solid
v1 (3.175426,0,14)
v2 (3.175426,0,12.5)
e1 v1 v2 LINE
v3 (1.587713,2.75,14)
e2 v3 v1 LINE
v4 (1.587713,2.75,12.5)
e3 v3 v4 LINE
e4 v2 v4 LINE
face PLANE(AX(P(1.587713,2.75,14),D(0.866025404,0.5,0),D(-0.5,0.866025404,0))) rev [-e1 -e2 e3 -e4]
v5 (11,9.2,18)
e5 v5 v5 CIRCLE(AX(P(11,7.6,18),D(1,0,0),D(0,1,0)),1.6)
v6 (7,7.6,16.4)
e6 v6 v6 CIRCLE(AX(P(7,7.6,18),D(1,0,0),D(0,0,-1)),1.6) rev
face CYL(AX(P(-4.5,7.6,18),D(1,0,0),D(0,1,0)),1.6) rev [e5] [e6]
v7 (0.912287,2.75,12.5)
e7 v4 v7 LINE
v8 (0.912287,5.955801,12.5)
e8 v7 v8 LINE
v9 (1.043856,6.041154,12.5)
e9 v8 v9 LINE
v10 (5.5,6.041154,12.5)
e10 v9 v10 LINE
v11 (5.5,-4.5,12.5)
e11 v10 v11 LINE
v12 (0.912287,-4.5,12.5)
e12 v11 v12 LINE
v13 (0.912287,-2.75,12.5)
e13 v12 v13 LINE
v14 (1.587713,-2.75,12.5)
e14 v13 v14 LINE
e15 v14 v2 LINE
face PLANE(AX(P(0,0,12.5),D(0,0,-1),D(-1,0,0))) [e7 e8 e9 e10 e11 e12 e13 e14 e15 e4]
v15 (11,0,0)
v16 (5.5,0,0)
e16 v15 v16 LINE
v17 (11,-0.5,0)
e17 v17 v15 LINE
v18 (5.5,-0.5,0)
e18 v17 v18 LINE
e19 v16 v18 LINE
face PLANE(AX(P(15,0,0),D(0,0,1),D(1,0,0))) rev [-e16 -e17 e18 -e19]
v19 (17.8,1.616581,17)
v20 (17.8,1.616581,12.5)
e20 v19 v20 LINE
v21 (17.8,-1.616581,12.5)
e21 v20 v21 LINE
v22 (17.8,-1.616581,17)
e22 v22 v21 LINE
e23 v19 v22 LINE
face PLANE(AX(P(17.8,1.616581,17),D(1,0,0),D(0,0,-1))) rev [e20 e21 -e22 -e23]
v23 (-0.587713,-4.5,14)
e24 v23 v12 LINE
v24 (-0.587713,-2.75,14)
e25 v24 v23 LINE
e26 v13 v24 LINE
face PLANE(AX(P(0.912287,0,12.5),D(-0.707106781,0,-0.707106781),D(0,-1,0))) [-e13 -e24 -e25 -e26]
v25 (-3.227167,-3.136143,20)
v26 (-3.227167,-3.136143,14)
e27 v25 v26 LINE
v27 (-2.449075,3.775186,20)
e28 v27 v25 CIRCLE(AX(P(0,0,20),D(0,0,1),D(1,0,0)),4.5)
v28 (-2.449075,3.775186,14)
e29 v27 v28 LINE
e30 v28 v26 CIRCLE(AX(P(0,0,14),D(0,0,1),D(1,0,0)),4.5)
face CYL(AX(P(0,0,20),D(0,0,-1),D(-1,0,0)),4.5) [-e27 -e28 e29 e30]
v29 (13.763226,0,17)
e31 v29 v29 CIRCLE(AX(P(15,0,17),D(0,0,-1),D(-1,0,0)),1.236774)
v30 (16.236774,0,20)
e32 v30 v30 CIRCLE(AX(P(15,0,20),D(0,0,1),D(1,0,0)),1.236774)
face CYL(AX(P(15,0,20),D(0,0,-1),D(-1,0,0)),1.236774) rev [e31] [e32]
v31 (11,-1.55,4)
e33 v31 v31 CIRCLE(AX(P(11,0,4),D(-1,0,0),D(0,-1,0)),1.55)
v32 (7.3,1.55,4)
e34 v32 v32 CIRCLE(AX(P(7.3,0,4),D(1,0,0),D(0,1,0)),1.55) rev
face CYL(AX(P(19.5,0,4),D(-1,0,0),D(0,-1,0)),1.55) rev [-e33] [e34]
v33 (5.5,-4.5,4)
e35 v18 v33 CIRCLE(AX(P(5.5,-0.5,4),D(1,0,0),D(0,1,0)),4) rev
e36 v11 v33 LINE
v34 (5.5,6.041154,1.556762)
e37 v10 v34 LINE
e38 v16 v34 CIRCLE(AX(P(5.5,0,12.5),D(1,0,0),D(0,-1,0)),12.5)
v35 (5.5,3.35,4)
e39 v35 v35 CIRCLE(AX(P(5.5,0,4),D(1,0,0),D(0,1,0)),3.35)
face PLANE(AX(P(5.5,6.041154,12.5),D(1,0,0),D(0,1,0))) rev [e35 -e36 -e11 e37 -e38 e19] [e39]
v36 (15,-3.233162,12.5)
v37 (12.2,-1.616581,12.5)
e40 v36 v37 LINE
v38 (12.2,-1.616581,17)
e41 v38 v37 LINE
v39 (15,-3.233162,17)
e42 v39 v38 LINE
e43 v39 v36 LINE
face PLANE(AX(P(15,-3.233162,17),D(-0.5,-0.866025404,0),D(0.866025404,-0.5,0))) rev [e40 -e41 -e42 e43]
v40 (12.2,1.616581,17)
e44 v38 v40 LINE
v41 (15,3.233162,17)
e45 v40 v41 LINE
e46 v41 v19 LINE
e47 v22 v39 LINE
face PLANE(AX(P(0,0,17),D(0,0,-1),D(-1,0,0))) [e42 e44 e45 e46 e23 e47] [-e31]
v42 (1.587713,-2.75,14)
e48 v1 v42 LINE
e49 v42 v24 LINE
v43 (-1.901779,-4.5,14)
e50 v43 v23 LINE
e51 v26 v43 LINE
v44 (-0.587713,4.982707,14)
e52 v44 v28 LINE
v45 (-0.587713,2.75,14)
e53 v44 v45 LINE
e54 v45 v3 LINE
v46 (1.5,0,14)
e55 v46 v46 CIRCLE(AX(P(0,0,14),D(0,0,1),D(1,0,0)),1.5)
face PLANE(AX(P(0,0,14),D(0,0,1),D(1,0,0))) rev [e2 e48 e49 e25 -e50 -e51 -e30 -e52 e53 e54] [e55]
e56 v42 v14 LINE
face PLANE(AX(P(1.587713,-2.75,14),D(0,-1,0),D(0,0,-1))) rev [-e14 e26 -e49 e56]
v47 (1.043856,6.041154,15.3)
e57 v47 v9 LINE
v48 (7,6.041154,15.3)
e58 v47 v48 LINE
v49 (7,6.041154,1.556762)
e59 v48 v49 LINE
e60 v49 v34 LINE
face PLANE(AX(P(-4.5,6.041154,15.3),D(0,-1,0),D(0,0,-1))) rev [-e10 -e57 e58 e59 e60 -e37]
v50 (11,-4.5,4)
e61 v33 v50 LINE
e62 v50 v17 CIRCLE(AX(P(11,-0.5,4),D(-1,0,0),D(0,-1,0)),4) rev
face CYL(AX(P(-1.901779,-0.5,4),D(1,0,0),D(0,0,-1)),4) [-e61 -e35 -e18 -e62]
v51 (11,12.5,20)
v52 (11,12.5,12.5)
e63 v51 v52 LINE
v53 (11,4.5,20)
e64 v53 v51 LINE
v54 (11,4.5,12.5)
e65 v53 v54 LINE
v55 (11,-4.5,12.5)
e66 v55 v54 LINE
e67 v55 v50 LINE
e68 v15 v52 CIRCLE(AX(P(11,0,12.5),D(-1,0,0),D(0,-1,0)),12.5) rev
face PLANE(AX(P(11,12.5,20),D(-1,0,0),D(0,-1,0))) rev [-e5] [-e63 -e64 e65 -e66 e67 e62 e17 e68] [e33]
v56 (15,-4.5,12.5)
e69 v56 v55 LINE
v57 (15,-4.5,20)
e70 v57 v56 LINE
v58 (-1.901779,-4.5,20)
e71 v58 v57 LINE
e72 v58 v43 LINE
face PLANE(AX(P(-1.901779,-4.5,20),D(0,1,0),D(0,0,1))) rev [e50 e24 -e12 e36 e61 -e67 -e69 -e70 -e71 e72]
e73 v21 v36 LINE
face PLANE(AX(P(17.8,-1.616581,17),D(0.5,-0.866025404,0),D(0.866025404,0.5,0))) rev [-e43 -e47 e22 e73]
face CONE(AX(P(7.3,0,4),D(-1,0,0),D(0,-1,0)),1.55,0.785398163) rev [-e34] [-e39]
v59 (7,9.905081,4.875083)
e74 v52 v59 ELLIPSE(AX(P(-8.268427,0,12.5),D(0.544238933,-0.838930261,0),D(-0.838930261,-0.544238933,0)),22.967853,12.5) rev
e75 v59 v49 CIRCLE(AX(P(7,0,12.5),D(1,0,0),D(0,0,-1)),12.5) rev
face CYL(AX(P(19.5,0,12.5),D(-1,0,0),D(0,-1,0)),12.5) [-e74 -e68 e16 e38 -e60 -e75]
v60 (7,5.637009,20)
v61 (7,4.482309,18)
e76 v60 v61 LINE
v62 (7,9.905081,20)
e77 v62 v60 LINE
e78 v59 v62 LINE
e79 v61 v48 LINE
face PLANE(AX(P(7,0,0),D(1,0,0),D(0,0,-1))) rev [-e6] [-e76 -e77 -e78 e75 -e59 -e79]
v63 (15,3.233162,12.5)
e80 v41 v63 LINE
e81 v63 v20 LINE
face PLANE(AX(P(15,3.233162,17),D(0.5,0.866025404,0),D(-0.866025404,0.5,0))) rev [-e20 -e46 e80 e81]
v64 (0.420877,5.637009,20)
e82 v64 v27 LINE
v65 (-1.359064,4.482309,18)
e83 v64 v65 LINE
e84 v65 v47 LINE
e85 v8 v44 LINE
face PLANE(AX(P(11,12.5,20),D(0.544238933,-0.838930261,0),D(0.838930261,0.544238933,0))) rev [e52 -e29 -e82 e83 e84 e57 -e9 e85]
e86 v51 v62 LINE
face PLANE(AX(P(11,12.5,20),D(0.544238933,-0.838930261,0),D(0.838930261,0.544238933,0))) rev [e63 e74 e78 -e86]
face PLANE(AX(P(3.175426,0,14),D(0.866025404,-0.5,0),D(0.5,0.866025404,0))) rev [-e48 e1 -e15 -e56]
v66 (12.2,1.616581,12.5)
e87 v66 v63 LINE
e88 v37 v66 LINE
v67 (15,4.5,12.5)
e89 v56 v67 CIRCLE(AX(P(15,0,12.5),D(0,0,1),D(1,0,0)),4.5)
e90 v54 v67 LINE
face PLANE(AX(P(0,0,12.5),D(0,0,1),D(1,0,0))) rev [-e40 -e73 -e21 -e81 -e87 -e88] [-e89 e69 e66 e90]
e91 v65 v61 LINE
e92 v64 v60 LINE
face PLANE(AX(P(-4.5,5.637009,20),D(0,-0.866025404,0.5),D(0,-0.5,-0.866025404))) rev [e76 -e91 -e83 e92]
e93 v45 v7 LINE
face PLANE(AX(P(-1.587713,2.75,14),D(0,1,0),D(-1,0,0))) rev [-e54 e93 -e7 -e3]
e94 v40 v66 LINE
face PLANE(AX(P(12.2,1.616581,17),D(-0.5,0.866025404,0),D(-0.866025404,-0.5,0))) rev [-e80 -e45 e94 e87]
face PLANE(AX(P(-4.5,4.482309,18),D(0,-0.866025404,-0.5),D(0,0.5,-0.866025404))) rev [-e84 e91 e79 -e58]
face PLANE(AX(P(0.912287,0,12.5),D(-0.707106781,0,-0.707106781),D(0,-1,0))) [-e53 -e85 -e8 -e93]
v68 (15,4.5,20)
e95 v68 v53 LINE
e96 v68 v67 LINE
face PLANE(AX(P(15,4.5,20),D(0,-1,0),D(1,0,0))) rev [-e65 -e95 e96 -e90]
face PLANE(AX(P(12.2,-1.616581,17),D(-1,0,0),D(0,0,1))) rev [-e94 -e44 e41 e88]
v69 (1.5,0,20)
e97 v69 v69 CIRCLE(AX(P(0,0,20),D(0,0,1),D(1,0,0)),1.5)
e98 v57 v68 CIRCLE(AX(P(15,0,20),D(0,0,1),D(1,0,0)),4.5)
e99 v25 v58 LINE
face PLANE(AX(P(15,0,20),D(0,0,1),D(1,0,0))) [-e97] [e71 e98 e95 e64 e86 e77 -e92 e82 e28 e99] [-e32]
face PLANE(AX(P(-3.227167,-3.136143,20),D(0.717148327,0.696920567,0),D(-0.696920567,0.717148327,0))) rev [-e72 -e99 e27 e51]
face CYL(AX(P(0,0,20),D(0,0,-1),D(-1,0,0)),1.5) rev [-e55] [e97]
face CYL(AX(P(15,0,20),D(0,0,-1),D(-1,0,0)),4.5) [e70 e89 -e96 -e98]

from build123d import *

# Parameters (mm, degrees)
SKETCH1_R           = 1.5
SKETCH1_R_2         = 1.236773622
BOSS_EXTRUDE1_DEPTH = 20
SKETCH3_R           = 1.6
CUT_EXTRUDE3_DEPTH  = 29.222331583
CUT_EXTRUDE4_DEPTH  = 14
CUT_EXTRUDE5_START  = -4
CUT_EXTRUDE5_DEPTH  = 25.222331583
SKETCH6_W           = 8.5
SKETCH6_H           = 9
SKETCH6_W_2         = 10
SKETCH6_H_2         = 10.541154273
CUT_EXTRUDE6_DEPTH  = 12.5
CHAMFER2_SIZE       = 2.5
CUT_EXTRUDE7_DEPTH  = 4.5
SKETCH8_R           = 1.55
CUT_EXTRUDE8_DEPTH  = 28.427176304
FILLET1_R           = 4
CHAMFER4_SIZE       = 1.8


with BuildPart() as part:
    # Sketch1 → Boss-Extrude1 (new body)
    with BuildSketch(Plane.XY):
        with BuildLine():
            Line((11, 12.5), (-2.4490752, 3.775186176))
            ThreePointArc((-2.4490752, 3.775186176), (-4.471750095, 0.503439255), (-3.227167472, -3.136142553))
            Line((-3.227167472, -3.136142553), (-1.901778748, -4.5))
            Line((-1.901778748, -4.5), (15, -4.5))
            ThreePointArc((15, -4.5), (19.5, 0), (15, 4.5))
            Line((15, 4.5), (11, 4.5))
            Line((11, 4.5), (11, 12.5))
        make_face()
        Circle(SKETCH1_R, mode=Mode.SUBTRACT)
        with Locations((15, 0)):
            Circle(SKETCH1_R_2, mode=Mode.SUBTRACT)
    extrude(amount=BOSS_EXTRUDE1_DEPTH)

    # Sketch3 → Cut-Extrude3 (cut, through all)
    with BuildSketch(Plane(origin=(11, 0, 0), x_dir=(0, 0, -1), z_dir=(1, 0, 0))):
        with Locations(Location((-18, 7.6, 0), (0, 0, 90))):
            Circle(SKETCH3_R)
    extrude(amount=-CUT_EXTRUDE3_DEPTH, mode=Mode.SUBTRACT)

    # Sketch4 → Cut-Extrude4 (cut)
    with BuildSketch(Plane(origin=(0, 0, 0), x_dir=(-1, 0, 0), z_dir=(0, 0, -1))):
        Polygon((1.58771324, 2.75), (1.58771324, 5.862379977), (6.597571209, 5.862379977), (6.597571209, -6.099785374), (1.58771324, -6.099785374), (1.58771324, -2.75), (-1.58771324, -2.75), (-3.175426481, 0), (-1.58771324, 2.75), align=None)
    extrude(amount=-CUT_EXTRUDE4_DEPTH, mode=Mode.SUBTRACT)

    # Sketch5 → Cut-Extrude5 (cut, through all)
    with BuildSketch(Plane(origin=(11, 0, 0), x_dir=(0, 0, -1), z_dir=(1, 0, 0)).offset(CUT_EXTRUDE5_START)):
        Polygon((-15.3, 6.041154273), (0, 6.041154273), (0, 11.349742261), (-20, 11.872391992), (-20, 5.637009085), (-18, 4.482308546), align=None)
    extrude(amount=-CUT_EXTRUDE5_DEPTH, mode=Mode.SUBTRACT)

    # Sketch6 → Cut-Extrude6 (cut)
    with BuildSketch(Plane(origin=(0, 0, 0), x_dir=(-1, 0, 0), z_dir=(0, 0, -1))):
        with Locations((-15.25, 0)):
            Rectangle(SKETCH6_W, SKETCH6_H)
        with Locations((-0.5, 0.770577137)):
            Rectangle(SKETCH6_W_2, SKETCH6_H_2)
    extrude(amount=-CUT_EXTRUDE6_DEPTH, mode=Mode.SUBTRACT)

    # Chamfer2
    # the kernel refuses this chamfer: 2.5 mm, written as the material it takes off along each edge
    with BuildSketch(Plane(origin=(-1.58771324, -10.92920747, 12.5), x_dir=(-0.027495876610586403, 0, 0.9996219169112968), z_dir=(0, 1, 0))) as chamfer2_piece_1_section:
        Polygon((CHAMFER2_SIZE * 0.999621916911, CHAMFER2_SIZE * 0.0274958766106), (-CHAMFER2_SIZE * 0.0274958766106, CHAMFER2_SIZE * 0.999621916911), (0, 0), align=None)
    chamfer2_piece_1 = extrude(amount=14.60841494, mode=Mode.PRIVATE)
    chamfer2_piece_1 = split(chamfer2_piece_1, bisect_by=Plane(origin=(-0.650189591, -3.625, 14), z_dir=(0, 0, -1)), keep=Keep.TOP, mode=Mode.PRIVATE)
    add(chamfer2_piece_1, mode=Mode.SUBTRACT)
    with BuildSketch(Plane(origin=(-1.58771324, -3.67920747, 12.5), x_dir=(-0.027495876610586403, 0, 0.9996219169112968), z_dir=(0, 1, 0))) as chamfer2_piece_2_section:
        Polygon((CHAMFER2_SIZE * 0.999621916911, CHAMFER2_SIZE * 0.0274958766106), (-CHAMFER2_SIZE * 0.0274958766106, CHAMFER2_SIZE * 0.999621916911), (0, 0), align=None)
    chamfer2_piece_2 = extrude(amount=14.442392157, mode=Mode.PRIVATE)
    chamfer2_piece_2 = split(chamfer2_piece_2, bisect_by=Plane(origin=(-0.650189591, 3.541988609, 14), z_dir=(0, 0, -1)), keep=Keep.TOP, mode=Mode.PRIVATE)
    add(chamfer2_piece_2, mode=Mode.SUBTRACT)

    # Sketch7 → Cut-Extrude7 (cut)
    with BuildSketch(Plane(origin=(0, 0, 12.5), x_dir=(-1, 0, 0), z_dir=(0, 0, -1))):
        Polygon((-12.2, -1.616580754), (-12.2, 1.616580754), (-15, 3.233161507), (-17.8, 1.616580754), (-17.8, -1.616580754), (-15, -3.233161507), align=None)
    extrude(amount=-CUT_EXTRUDE7_DEPTH, mode=Mode.SUBTRACT)

    # Sketch8 → Cut-Extrude8 (cut, through all)
    with BuildSketch(Plane.ZY.offset(-5.5)):
        with Locations(Location((4, 0, 0), (0, 0, 270))):
            Circle(SKETCH8_R)
        with BuildLine():
            Line((12.5, 12.5), (0, 12.5))
            Line((0, 12.5), (0, 0))
            ThreePointArc((0, 0), (3.661165235, 8.838834765), (12.5, 12.5))
        make_face()
    extrude(amount=-CUT_EXTRUDE8_DEPTH, mode=Mode.SUBTRACT)

    # Fillet1
    fillet1_edges = [part.edges().sort_by_distance(p)[0] for p in [
        (8.25, -4.5, 0),
    ]]
    fillet(fillet1_edges, radius=FILLET1_R)

    # Chamfer4
    chamfer4_edges = [part.edges().sort_by_distance(p)[0] for p in [
        (5.5, 1.55, 4),
    ]]
    chamfer(chamfer4_edges, length=CHAMFER4_SIZE)


solid = part.part
